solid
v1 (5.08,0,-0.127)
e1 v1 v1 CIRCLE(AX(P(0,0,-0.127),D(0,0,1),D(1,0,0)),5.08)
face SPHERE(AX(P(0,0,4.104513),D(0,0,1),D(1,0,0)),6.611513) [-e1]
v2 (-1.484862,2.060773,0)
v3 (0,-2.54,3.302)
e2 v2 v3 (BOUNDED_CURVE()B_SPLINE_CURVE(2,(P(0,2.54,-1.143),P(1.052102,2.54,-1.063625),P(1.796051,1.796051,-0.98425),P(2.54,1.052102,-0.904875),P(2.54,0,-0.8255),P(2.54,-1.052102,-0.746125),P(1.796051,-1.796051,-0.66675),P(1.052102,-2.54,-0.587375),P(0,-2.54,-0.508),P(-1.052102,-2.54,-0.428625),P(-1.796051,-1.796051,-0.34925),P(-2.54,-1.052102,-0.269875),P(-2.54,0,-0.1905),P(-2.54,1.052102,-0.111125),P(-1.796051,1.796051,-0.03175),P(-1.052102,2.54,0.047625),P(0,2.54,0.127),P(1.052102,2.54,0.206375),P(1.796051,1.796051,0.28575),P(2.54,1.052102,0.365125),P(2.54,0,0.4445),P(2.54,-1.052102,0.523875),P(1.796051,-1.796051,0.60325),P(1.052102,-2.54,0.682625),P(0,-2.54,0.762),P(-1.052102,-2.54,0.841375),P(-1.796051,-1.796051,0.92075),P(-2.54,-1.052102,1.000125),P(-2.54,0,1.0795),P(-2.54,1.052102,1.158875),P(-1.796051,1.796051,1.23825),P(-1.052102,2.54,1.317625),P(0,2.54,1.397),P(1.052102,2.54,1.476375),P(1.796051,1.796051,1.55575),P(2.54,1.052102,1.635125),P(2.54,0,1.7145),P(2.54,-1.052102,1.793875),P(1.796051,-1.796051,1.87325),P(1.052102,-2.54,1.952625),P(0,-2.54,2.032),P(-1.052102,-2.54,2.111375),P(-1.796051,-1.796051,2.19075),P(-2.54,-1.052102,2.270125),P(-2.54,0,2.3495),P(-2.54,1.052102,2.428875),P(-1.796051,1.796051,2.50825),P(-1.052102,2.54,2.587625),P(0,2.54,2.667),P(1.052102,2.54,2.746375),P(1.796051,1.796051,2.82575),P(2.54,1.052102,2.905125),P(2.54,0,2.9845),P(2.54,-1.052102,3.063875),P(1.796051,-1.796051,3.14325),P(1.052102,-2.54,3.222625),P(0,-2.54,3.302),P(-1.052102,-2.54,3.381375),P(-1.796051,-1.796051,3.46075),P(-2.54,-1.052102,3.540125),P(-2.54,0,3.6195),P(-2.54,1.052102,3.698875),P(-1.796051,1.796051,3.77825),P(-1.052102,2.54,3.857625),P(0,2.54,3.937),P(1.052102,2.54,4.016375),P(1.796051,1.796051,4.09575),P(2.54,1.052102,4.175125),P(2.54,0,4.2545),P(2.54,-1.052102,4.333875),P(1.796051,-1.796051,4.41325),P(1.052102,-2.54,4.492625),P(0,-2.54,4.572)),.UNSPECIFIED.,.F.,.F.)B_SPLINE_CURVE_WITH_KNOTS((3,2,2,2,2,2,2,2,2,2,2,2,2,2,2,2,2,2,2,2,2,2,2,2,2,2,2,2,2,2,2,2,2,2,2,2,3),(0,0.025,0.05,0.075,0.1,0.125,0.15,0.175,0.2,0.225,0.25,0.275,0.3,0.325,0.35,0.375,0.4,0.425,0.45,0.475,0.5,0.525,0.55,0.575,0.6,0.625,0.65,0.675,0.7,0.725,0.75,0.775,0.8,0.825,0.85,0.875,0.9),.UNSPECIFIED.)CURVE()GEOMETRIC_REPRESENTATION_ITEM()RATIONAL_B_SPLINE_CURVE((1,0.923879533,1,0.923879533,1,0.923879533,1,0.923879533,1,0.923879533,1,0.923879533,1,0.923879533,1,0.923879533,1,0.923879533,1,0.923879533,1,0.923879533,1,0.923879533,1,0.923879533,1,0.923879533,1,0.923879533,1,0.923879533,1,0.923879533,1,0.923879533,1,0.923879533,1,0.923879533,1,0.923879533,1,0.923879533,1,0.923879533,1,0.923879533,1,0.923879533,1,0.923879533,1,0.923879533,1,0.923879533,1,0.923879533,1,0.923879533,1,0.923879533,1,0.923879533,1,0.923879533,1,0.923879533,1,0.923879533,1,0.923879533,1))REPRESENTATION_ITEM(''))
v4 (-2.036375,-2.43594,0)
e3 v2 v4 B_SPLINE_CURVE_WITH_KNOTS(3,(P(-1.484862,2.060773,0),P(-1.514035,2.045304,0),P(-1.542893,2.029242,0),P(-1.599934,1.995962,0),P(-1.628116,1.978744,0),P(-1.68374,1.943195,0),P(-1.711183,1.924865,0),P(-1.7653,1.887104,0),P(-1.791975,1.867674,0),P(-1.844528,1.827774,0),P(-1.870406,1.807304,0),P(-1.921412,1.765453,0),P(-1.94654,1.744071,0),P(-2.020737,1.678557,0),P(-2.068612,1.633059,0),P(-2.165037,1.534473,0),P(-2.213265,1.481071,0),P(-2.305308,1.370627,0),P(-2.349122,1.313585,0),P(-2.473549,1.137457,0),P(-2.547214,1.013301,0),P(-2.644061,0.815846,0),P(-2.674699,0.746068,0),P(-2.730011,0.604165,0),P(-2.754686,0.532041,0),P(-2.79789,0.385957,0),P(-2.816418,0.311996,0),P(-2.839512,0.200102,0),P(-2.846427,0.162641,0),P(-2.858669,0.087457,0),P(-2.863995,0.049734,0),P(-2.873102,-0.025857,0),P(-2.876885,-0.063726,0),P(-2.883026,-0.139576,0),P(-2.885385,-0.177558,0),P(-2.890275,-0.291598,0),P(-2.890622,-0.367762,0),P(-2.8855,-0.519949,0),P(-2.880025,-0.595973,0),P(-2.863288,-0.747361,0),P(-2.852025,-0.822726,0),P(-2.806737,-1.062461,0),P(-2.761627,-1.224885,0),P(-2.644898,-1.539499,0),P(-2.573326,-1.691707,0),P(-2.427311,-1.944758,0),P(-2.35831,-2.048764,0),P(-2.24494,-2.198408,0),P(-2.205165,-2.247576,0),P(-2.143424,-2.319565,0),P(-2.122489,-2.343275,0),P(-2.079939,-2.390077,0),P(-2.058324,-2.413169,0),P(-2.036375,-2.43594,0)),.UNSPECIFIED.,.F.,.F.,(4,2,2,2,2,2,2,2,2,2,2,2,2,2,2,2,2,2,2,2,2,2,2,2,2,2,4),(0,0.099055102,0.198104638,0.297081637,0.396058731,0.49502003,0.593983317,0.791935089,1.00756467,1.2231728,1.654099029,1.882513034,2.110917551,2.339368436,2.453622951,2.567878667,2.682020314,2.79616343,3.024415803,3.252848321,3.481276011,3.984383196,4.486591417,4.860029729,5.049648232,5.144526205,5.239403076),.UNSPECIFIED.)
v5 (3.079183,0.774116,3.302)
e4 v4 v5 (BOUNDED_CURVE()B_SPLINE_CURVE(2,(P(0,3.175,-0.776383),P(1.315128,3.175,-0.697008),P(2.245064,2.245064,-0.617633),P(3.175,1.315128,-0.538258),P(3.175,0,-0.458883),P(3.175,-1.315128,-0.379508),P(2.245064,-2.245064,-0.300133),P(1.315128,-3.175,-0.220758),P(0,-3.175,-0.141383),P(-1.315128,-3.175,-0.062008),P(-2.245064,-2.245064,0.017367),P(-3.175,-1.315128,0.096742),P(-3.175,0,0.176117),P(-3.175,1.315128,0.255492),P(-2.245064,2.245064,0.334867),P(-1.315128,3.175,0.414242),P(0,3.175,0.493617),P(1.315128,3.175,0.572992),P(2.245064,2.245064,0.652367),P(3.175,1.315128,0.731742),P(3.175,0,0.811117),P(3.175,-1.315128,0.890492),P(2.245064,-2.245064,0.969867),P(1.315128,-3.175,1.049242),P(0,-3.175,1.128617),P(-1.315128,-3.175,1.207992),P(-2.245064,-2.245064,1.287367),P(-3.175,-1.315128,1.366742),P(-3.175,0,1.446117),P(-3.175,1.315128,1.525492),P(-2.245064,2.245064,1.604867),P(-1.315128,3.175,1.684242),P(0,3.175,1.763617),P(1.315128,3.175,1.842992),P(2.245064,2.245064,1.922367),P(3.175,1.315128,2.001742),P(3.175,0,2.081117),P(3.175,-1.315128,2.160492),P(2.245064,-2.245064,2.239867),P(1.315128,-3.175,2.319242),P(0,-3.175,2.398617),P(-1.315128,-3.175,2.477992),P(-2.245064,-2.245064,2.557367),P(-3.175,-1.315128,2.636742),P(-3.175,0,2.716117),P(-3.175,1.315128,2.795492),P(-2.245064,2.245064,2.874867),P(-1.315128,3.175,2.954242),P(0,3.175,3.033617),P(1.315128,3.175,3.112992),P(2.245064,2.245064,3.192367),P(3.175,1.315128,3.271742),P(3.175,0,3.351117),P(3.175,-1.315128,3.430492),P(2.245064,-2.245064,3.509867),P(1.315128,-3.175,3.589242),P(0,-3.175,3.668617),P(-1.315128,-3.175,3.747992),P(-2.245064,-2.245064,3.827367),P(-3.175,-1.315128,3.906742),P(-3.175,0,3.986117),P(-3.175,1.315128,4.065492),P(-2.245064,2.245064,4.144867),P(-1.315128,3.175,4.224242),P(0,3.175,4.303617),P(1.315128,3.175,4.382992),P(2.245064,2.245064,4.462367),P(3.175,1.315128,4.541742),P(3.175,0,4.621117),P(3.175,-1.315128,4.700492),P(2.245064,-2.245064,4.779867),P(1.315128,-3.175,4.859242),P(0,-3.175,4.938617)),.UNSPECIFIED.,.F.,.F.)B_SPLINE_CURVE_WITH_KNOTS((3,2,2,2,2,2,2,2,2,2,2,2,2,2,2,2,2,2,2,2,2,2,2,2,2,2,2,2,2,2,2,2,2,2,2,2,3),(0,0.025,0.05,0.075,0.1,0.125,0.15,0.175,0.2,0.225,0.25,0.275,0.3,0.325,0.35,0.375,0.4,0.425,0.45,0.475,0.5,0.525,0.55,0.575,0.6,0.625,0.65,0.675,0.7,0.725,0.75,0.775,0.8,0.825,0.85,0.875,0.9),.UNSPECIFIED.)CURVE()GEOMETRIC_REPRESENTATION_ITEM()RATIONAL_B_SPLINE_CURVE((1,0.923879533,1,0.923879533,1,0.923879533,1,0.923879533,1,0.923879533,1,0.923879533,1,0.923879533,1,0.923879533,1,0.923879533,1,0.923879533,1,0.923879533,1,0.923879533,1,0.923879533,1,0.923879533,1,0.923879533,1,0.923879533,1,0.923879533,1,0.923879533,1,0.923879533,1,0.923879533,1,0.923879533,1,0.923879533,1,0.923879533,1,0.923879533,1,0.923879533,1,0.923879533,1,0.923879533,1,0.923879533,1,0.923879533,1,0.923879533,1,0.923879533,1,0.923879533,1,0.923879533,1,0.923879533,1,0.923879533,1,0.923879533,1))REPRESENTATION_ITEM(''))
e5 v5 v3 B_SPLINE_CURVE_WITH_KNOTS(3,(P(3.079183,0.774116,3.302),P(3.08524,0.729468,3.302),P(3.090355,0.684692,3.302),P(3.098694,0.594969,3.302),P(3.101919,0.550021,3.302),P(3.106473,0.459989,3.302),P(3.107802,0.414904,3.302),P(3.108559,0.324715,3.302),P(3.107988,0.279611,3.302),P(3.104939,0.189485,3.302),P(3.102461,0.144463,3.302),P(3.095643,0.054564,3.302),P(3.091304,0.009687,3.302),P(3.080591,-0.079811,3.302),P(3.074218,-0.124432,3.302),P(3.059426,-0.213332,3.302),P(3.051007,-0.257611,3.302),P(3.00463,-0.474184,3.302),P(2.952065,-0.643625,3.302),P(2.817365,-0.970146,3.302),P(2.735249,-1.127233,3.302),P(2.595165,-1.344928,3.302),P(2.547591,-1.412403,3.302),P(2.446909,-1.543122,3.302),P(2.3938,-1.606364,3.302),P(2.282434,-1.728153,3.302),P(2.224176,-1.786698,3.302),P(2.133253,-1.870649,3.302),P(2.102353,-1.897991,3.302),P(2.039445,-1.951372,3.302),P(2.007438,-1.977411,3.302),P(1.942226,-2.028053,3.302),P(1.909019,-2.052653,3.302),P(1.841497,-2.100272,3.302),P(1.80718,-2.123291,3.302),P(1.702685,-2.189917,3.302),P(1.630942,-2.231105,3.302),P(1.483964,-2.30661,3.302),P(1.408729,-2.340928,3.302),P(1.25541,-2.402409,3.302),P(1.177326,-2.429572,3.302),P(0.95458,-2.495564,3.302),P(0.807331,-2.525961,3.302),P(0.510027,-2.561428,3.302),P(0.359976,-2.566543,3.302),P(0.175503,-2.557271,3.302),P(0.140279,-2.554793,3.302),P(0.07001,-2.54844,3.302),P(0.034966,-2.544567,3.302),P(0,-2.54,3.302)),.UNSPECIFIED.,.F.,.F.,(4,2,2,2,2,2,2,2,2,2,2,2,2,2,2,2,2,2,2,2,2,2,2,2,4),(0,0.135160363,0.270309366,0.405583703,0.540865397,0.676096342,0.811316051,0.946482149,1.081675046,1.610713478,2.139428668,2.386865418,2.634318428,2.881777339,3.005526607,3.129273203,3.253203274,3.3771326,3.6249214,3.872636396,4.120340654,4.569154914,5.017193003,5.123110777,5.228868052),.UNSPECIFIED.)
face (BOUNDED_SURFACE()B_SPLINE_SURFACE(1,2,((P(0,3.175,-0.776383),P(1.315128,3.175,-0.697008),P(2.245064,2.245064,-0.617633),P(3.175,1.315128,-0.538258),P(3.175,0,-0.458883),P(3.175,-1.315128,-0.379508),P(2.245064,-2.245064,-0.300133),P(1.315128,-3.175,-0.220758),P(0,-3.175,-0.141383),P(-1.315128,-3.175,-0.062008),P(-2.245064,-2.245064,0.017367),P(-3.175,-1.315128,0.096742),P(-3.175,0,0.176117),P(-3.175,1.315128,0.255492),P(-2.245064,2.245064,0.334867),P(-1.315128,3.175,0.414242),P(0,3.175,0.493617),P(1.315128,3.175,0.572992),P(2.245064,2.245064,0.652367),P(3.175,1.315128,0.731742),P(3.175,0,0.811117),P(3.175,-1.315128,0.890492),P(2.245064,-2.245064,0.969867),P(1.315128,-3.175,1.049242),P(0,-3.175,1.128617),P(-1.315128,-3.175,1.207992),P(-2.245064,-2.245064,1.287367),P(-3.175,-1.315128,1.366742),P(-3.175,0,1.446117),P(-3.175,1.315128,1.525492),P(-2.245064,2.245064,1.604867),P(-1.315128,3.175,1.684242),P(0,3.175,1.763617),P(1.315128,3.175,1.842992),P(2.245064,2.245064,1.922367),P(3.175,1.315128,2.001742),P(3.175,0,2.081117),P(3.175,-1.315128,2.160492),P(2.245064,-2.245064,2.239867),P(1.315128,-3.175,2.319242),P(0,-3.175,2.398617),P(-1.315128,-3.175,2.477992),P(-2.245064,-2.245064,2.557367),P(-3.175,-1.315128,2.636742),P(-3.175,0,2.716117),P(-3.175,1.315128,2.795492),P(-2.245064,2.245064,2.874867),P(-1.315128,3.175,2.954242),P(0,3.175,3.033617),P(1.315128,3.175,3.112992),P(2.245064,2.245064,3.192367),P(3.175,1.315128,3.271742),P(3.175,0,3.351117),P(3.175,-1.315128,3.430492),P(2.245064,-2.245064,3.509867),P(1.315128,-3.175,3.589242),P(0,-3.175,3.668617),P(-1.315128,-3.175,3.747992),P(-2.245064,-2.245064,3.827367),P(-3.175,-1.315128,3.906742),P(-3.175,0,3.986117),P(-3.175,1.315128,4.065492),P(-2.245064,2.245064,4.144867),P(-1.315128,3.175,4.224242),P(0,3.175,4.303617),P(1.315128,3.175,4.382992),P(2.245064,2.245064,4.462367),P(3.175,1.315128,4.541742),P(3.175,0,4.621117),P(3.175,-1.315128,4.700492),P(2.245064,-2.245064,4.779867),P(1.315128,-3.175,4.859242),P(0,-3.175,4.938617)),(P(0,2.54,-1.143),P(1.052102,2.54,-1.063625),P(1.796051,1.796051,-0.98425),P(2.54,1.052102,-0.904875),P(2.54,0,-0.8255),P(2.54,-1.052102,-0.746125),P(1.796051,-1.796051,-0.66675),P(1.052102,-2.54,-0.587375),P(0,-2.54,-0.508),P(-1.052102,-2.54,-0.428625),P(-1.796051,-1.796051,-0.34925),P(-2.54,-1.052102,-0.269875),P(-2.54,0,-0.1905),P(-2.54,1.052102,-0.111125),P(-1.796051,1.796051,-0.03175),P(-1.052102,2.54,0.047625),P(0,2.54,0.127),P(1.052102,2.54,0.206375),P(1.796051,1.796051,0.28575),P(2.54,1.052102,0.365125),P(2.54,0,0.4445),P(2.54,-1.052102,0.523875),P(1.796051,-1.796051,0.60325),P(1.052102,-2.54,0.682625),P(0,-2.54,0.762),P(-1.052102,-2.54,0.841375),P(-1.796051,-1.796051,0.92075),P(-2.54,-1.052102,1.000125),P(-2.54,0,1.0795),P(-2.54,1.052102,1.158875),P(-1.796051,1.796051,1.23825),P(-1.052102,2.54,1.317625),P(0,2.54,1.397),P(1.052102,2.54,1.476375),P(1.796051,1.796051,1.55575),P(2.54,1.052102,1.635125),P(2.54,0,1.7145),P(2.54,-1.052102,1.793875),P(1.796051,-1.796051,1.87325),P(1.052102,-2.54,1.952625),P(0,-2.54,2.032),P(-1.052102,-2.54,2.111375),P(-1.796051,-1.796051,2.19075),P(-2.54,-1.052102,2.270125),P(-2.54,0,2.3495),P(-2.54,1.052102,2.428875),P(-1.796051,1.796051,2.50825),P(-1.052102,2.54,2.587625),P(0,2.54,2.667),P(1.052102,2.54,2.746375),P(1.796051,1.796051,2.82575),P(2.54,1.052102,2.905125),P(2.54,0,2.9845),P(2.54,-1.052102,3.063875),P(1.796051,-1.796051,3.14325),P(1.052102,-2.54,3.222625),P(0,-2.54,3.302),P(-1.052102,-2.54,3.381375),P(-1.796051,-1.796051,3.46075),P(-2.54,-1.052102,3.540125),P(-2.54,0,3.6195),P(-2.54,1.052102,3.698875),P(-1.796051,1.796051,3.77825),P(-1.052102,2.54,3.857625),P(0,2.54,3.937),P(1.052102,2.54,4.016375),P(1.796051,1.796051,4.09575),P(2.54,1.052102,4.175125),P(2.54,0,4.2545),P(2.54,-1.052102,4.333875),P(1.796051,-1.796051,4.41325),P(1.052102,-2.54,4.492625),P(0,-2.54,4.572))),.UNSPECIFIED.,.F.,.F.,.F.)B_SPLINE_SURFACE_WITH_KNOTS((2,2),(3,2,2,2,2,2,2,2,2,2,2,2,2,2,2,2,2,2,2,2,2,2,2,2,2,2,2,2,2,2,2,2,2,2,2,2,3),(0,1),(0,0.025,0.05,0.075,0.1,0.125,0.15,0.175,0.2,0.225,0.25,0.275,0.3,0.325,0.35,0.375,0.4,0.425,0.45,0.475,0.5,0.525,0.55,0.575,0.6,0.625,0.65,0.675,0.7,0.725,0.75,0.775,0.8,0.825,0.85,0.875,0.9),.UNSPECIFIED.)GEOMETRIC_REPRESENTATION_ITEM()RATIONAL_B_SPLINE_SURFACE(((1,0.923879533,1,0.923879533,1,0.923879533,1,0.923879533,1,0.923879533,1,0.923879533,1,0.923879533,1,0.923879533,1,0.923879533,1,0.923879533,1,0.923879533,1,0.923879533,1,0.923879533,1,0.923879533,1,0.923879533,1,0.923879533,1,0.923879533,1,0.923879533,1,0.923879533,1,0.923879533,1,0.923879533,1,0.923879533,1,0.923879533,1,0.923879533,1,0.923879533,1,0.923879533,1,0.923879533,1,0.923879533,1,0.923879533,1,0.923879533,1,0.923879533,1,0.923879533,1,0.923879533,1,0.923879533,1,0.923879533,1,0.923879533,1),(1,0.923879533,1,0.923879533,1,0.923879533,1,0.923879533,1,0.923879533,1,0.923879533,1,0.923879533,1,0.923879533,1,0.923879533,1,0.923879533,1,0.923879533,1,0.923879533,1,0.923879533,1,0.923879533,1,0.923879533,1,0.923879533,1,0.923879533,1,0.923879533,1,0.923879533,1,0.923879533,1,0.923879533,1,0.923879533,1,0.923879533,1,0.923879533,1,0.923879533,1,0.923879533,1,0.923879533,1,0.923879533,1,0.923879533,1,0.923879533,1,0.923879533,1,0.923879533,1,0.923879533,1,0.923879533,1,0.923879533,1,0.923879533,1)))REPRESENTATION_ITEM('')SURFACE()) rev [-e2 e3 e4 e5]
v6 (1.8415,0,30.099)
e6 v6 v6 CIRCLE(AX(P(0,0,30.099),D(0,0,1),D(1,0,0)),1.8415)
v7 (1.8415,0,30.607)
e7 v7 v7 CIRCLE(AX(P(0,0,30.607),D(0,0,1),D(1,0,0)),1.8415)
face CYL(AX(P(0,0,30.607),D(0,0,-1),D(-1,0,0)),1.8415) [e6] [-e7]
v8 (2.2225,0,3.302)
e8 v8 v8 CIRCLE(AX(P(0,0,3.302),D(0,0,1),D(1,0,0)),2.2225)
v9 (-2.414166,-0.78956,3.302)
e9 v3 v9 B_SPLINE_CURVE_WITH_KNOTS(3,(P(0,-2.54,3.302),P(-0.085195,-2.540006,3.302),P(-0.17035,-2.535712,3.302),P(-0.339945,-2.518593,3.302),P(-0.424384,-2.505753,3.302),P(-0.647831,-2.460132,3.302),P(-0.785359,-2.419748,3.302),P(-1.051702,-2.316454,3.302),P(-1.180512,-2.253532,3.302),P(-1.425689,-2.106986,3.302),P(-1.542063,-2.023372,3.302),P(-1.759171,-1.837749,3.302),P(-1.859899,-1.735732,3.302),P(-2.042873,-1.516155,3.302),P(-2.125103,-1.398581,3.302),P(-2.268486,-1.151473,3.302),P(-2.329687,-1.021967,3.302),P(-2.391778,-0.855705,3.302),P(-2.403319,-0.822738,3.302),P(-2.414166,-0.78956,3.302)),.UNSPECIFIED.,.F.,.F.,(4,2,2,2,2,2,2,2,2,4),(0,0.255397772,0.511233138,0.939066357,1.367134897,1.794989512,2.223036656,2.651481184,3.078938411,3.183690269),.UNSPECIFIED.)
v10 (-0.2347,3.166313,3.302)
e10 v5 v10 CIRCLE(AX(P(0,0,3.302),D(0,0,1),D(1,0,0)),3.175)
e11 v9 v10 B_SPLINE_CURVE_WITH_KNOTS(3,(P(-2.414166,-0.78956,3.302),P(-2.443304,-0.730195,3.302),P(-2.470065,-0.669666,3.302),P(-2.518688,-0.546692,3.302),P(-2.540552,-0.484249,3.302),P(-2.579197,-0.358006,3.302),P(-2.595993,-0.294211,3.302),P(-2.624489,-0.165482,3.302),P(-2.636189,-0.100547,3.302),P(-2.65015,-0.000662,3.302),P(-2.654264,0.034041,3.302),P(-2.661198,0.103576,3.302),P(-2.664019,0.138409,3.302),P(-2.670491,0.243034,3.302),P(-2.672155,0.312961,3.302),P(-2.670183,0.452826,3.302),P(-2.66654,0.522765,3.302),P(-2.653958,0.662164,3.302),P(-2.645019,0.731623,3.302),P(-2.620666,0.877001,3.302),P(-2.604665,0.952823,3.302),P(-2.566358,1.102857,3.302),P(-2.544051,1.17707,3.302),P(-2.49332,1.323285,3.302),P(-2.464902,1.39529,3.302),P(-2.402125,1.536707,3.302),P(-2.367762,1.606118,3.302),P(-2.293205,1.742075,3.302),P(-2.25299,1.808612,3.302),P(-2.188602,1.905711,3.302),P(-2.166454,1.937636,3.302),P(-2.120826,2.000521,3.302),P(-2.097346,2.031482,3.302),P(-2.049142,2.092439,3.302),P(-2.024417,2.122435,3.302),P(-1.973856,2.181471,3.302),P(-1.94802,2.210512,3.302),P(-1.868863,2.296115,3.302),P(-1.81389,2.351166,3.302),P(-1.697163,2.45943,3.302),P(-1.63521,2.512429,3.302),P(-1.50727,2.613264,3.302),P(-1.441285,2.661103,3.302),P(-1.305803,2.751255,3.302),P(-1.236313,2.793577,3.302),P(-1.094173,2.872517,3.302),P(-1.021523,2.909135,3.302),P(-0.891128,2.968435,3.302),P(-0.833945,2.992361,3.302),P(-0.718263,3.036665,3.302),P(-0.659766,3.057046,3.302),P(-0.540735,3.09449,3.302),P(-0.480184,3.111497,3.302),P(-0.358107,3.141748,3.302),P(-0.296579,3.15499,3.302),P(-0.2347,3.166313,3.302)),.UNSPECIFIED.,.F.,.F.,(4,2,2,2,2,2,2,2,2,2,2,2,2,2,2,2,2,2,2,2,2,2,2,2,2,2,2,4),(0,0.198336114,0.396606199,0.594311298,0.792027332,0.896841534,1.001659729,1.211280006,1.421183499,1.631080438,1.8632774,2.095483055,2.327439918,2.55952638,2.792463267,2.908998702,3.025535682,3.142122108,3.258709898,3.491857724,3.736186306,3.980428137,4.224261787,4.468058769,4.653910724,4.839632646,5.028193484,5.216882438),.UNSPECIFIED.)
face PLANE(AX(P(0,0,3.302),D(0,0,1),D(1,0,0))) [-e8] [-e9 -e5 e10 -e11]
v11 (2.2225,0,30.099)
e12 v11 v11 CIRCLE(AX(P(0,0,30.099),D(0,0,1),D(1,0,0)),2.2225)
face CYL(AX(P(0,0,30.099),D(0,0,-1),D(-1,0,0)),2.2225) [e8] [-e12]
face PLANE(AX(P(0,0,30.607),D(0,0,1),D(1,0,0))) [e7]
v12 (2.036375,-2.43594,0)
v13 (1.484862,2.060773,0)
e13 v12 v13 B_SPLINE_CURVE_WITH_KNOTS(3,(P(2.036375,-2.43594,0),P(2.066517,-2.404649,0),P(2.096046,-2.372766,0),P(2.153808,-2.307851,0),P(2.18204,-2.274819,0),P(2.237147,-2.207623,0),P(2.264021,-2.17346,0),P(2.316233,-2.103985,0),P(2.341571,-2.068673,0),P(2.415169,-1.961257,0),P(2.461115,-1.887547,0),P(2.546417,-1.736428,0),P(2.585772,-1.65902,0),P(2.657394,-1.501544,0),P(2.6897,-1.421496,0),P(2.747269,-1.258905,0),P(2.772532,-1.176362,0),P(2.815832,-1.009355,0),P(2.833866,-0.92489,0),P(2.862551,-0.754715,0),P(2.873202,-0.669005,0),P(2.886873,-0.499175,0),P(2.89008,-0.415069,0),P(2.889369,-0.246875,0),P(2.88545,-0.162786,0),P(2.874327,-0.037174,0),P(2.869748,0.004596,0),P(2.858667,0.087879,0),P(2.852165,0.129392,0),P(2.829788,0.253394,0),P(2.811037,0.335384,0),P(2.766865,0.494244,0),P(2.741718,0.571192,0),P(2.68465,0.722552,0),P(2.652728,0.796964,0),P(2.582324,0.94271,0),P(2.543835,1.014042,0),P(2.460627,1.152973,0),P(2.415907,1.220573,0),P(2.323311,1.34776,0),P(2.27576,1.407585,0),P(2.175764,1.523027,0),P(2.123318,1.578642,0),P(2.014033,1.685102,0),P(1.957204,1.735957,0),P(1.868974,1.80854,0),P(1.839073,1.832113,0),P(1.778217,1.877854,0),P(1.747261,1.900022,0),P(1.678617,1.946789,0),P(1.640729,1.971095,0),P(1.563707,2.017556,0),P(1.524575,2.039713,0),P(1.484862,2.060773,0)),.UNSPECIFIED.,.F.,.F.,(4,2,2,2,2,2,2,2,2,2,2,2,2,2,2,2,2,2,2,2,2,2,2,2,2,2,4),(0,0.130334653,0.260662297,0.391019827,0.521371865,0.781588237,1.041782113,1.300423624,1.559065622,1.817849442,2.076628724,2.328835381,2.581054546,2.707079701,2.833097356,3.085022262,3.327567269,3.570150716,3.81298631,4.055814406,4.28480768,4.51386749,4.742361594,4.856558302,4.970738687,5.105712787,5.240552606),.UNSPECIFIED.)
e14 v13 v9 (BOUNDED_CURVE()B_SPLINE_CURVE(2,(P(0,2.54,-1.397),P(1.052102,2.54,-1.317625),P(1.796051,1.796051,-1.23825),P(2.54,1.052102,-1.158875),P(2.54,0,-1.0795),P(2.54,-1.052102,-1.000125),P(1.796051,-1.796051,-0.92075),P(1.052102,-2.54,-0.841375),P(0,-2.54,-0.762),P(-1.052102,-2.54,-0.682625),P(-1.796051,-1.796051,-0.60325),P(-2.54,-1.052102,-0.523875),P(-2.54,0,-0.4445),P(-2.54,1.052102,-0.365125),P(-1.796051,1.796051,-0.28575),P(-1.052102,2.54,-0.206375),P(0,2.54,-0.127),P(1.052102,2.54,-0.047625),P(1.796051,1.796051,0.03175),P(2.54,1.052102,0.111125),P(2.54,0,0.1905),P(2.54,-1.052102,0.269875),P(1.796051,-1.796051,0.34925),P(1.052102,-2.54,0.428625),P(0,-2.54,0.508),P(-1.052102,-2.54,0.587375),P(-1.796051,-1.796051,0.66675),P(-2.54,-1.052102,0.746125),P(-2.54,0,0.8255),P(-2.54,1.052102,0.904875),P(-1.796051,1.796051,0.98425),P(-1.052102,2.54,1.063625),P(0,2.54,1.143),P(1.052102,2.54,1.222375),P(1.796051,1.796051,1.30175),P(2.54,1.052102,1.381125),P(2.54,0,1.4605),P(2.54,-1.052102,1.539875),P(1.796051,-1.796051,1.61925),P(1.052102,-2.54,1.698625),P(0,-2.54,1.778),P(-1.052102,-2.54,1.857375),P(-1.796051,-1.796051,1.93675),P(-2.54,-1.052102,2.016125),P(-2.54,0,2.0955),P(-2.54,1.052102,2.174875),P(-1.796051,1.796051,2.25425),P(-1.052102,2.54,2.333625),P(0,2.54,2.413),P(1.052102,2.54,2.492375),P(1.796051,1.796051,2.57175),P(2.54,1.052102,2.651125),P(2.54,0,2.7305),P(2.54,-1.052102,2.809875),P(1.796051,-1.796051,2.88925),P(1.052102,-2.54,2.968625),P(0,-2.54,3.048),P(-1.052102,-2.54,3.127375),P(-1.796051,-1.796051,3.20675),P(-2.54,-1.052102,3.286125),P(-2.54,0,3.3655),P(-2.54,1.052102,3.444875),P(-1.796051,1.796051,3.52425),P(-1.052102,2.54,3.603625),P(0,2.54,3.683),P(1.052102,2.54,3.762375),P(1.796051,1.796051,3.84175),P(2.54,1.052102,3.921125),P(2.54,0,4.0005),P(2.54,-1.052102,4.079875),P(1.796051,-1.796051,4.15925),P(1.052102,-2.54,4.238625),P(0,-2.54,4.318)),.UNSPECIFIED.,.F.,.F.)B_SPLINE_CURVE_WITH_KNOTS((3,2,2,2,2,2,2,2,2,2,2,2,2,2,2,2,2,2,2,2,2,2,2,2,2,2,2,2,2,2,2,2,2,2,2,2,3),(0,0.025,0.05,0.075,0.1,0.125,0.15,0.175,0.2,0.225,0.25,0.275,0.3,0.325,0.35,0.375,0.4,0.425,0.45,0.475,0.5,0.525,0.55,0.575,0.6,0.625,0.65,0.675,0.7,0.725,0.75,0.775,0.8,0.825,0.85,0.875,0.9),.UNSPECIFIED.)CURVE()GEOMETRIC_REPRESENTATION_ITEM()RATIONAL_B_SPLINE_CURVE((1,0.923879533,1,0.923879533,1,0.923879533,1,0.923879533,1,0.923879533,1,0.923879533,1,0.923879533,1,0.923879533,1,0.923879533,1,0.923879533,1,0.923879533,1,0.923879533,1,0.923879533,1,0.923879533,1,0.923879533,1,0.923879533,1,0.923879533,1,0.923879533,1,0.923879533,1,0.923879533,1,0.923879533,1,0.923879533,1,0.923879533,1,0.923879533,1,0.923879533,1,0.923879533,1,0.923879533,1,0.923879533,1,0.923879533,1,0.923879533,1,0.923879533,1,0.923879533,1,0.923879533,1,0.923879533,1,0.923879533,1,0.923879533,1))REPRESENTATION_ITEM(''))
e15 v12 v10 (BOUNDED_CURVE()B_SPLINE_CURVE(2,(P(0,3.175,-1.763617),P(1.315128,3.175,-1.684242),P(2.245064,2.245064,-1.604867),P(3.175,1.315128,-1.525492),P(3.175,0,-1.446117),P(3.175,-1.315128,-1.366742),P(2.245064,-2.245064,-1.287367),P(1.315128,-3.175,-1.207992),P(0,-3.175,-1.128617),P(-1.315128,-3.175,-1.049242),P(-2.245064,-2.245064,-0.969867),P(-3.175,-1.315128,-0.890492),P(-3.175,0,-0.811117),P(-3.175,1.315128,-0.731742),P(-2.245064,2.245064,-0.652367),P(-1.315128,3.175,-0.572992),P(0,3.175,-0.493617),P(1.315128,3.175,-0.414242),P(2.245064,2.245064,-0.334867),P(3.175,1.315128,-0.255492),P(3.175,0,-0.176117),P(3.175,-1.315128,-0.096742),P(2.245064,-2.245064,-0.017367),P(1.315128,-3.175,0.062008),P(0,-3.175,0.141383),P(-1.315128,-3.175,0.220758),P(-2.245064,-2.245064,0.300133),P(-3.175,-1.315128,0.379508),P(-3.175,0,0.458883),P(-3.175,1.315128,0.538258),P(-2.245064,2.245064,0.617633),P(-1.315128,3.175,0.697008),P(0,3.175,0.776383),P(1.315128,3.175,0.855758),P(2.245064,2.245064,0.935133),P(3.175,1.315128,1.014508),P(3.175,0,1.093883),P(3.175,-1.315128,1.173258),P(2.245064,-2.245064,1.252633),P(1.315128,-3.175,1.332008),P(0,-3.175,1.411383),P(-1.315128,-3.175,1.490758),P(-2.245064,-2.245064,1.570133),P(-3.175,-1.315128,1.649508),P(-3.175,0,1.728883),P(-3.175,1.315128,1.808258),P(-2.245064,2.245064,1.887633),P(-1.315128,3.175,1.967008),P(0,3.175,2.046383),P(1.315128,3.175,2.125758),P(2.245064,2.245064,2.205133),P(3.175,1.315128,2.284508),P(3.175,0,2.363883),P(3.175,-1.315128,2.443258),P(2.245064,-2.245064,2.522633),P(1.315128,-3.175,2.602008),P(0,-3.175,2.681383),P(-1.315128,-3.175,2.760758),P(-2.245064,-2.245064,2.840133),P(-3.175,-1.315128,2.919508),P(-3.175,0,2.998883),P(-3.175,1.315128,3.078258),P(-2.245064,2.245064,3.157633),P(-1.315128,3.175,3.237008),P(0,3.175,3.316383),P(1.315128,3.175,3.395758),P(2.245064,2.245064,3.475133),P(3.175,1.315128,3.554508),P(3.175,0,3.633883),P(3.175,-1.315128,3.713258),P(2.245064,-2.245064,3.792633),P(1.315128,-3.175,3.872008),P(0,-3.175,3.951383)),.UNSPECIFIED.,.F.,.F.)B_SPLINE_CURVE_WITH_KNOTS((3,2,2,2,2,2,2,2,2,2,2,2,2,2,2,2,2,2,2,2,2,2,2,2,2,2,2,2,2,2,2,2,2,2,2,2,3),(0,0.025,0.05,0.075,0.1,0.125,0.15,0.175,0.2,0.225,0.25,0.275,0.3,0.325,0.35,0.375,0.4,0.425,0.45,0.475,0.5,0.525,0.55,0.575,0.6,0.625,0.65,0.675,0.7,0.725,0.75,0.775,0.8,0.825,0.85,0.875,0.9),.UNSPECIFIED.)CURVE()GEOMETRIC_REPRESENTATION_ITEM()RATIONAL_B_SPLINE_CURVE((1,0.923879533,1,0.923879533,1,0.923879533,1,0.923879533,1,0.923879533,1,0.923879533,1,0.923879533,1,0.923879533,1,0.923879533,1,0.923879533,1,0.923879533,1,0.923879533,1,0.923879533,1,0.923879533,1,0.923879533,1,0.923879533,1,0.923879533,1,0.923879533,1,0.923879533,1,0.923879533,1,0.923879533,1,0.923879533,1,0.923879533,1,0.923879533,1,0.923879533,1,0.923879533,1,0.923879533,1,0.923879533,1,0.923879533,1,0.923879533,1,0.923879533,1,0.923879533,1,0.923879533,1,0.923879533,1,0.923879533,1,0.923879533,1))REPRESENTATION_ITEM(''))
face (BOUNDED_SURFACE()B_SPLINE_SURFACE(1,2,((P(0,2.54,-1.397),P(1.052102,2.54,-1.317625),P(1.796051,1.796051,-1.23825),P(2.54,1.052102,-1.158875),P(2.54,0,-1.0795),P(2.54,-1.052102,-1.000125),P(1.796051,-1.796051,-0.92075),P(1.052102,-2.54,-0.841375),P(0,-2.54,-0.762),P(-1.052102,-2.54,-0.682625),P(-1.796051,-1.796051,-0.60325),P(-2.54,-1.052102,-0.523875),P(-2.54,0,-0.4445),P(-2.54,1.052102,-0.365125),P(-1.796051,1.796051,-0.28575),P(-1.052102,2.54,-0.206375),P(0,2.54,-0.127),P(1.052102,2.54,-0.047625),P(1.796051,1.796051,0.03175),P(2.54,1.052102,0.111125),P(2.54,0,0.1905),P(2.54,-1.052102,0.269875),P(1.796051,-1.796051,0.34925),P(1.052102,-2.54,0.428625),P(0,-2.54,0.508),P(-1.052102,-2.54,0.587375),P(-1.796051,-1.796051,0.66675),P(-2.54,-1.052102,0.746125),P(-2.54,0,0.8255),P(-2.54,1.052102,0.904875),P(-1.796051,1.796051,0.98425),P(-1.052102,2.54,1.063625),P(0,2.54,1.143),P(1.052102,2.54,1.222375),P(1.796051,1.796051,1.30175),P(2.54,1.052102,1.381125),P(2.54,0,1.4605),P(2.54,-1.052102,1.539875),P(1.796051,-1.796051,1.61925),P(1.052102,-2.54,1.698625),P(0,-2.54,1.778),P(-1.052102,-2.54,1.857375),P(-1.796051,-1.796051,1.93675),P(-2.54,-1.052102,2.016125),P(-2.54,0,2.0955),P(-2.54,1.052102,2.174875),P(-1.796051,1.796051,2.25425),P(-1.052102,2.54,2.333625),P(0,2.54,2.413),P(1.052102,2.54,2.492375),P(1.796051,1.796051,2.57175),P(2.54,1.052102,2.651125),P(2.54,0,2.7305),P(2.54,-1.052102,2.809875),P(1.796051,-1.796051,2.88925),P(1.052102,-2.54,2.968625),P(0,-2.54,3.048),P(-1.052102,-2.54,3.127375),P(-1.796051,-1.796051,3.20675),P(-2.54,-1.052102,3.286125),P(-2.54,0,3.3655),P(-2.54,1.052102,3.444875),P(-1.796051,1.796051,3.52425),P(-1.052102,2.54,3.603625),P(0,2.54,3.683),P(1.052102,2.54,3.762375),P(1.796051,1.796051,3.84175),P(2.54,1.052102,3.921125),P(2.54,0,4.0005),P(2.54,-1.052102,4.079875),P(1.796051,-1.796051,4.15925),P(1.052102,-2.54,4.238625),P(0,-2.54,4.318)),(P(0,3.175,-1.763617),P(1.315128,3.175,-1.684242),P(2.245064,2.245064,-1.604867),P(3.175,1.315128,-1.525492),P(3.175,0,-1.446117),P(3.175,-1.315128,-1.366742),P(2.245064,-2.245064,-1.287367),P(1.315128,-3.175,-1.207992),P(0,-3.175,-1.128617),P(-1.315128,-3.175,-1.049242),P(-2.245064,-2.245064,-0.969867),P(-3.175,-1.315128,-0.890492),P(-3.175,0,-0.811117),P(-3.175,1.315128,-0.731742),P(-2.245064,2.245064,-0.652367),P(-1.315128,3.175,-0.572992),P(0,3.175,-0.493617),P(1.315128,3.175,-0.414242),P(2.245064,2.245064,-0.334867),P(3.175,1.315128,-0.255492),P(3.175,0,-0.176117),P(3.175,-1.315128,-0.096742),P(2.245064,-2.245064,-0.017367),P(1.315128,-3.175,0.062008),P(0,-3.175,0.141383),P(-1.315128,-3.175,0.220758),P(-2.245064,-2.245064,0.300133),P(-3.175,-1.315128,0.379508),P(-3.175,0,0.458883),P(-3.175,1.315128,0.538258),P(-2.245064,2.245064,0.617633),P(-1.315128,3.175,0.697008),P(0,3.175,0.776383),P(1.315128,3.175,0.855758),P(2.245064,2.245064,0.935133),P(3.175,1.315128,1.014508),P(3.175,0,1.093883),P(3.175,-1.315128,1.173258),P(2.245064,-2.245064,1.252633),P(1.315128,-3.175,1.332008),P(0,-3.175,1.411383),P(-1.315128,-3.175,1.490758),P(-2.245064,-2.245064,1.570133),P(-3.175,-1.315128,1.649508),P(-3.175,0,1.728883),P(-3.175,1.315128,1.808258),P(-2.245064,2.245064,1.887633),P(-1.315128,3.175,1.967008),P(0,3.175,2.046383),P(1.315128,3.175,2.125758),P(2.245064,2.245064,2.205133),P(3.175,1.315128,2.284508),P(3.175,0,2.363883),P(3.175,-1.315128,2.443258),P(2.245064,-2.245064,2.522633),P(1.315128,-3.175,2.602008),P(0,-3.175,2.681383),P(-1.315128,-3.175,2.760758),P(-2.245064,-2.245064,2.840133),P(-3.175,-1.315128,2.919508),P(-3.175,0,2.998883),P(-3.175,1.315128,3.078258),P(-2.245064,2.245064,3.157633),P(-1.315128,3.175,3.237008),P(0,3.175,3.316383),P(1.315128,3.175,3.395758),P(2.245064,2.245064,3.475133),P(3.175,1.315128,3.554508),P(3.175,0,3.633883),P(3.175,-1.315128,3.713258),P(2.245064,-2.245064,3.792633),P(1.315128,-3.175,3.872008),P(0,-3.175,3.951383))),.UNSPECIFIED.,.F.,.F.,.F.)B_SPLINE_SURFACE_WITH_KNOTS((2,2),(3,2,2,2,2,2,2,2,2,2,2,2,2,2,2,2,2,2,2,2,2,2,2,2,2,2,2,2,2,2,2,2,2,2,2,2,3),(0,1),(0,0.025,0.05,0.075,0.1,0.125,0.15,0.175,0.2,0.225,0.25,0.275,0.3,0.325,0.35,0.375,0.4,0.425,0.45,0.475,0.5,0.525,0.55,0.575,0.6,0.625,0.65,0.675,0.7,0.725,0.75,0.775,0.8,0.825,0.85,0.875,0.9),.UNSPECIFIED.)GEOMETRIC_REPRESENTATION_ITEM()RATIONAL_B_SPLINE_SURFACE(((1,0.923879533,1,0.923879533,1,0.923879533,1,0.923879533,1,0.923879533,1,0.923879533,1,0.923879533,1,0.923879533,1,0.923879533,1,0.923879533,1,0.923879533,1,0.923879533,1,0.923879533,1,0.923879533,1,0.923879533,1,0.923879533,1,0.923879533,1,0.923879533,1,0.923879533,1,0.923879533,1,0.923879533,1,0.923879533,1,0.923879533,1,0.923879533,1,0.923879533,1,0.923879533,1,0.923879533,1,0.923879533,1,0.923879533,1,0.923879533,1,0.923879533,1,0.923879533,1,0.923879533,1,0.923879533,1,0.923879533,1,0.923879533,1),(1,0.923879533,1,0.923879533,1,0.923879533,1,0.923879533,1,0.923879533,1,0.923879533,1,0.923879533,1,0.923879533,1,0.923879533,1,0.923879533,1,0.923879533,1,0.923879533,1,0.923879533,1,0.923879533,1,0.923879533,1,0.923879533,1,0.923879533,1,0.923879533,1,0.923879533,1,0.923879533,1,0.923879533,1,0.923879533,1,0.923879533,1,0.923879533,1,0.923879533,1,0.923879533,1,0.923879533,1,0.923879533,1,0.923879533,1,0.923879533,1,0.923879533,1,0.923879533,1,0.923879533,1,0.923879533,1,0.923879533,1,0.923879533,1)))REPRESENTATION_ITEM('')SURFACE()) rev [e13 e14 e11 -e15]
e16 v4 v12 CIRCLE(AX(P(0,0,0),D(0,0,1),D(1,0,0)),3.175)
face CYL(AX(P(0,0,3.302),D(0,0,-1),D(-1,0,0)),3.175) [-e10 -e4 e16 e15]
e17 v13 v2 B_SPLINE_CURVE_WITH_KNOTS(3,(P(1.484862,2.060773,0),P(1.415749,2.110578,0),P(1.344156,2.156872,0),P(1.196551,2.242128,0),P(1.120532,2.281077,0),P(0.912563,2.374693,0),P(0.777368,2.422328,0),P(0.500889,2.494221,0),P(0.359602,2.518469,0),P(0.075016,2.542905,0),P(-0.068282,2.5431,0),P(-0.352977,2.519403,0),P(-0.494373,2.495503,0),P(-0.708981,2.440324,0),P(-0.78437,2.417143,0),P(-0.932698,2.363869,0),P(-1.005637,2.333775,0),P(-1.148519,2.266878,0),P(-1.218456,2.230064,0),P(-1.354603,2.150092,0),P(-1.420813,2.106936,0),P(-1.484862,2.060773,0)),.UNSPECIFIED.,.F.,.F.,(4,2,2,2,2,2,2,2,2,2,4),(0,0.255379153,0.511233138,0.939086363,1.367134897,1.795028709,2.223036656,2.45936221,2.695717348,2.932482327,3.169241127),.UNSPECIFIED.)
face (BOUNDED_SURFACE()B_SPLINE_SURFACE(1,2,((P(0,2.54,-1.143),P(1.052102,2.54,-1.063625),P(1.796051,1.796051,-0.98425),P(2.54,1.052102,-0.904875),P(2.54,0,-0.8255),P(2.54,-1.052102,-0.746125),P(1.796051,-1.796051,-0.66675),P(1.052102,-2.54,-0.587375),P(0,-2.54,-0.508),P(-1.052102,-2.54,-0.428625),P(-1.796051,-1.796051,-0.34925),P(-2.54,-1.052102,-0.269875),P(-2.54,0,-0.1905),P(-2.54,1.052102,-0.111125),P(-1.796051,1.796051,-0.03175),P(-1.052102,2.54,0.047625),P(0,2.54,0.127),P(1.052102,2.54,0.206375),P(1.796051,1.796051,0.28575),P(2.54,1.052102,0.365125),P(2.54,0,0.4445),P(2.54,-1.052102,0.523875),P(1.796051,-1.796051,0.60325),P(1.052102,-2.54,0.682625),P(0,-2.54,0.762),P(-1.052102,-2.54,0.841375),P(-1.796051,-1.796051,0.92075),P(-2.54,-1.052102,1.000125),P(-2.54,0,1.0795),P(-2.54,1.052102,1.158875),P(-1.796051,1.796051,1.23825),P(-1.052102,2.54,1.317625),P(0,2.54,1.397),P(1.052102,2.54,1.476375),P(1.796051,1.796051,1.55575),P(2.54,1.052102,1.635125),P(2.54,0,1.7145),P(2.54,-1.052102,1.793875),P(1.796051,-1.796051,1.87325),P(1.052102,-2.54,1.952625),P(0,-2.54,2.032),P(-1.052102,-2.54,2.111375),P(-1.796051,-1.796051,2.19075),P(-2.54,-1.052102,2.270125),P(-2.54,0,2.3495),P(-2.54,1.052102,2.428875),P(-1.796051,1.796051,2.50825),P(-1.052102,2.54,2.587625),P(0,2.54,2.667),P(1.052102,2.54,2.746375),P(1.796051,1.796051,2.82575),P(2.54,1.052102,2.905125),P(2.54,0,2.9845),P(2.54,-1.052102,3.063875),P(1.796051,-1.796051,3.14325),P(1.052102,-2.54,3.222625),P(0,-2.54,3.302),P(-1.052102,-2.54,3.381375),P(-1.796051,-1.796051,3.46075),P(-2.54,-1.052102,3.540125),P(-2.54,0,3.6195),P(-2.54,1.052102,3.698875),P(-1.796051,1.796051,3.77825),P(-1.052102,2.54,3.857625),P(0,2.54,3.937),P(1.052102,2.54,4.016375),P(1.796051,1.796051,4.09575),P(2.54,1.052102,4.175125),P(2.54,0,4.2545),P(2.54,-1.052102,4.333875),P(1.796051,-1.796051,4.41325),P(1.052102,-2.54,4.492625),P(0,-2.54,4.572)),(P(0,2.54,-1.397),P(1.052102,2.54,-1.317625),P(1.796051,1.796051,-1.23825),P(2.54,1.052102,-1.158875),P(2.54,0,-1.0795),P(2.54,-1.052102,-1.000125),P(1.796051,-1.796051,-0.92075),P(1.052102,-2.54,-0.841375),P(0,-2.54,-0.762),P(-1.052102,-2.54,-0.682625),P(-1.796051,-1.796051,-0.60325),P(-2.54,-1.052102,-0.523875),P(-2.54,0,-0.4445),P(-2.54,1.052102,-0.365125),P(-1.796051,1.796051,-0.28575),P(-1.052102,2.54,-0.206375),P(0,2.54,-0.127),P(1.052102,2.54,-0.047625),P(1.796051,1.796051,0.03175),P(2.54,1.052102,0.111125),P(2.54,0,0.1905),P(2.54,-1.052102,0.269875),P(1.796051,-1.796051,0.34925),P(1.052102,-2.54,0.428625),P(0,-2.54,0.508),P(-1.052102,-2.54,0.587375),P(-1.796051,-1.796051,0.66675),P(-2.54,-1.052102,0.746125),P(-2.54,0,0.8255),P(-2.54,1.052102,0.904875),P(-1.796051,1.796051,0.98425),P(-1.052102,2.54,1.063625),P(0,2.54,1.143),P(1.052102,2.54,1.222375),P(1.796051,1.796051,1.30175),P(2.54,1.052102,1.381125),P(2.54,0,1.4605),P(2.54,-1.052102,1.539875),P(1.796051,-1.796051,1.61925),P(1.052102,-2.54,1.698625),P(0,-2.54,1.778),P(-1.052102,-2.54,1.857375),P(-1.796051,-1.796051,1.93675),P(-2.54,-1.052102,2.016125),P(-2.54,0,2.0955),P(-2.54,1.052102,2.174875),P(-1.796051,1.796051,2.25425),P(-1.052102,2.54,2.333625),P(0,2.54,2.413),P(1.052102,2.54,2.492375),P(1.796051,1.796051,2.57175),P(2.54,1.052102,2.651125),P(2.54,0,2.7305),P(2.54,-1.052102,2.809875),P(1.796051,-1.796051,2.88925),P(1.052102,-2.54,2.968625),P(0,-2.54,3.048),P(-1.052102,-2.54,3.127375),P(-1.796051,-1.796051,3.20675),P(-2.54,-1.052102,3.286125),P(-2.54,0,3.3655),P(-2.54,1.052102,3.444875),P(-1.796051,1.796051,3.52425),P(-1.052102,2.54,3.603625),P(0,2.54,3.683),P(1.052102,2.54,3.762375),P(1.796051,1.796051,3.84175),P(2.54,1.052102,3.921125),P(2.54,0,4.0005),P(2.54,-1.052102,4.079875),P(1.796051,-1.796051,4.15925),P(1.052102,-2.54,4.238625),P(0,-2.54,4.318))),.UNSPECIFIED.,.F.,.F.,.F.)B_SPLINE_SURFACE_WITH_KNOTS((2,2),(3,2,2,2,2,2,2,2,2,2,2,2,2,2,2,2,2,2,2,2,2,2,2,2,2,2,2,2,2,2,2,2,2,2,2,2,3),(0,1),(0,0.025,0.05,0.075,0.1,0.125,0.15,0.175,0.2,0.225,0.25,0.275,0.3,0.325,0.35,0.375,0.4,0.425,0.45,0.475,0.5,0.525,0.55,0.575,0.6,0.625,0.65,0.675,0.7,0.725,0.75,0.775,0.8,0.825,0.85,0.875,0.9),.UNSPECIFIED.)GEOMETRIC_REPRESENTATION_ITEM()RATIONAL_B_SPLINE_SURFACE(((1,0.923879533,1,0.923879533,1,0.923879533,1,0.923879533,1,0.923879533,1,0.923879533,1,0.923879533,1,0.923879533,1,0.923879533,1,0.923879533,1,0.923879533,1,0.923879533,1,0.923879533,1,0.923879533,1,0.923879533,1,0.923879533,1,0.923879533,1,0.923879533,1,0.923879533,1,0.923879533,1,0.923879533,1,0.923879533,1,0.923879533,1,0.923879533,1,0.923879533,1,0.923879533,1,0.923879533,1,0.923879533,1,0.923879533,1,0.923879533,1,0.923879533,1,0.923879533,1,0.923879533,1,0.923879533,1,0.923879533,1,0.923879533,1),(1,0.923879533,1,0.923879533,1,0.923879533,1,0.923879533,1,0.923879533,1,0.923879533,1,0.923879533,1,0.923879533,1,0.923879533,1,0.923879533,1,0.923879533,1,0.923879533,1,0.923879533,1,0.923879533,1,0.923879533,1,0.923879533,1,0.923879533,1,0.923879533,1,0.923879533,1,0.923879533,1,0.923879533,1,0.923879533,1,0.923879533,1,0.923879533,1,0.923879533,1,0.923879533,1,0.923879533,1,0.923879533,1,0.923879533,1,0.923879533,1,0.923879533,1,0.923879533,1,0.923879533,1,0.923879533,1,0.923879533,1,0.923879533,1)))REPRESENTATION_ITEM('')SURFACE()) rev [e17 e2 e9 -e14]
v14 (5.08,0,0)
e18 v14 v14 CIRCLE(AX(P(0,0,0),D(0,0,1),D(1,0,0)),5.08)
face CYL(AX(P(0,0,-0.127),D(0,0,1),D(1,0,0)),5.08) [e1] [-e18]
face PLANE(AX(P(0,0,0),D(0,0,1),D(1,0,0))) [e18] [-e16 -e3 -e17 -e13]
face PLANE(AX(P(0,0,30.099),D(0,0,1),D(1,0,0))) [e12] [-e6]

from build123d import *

# Parameters (mm, degrees)
SKETCH3_R           = 3.175
BOSS_EXTRUDE1_DEPTH = 3.302
CUT_SWEEP1_PITCH    = 1.27
SKETCH10_R          = 2.2225
BOSS_EXTRUDE5_DEPTH = 26.797
SKETCH9_R           = 5.08
BOSS_EXTRUDE4_DEPTH = 0.127
DOME3_FACE_RADIUS   = 5.08
DOME3_HEIGHT        = 2.38
SKETCH11_R          = 1.8415
BOSS_EXTRUDE6_DEPTH = 0.508


with BuildPart() as part:
    # Sketch3 → Boss-Extrude1 (new body)
    with BuildSketch(Plane.XY):
        with Locations(Location((0, 0, 0), (0, 0, 180))):
            Circle(SKETCH3_R)
    extrude(amount=BOSS_EXTRUDE1_DEPTH)

    # Cut-Sweep1: arcs per turn and ends read off the stored shape
    # Cut-Sweep1: the profile of Sketch5 profile screwed along a left-hand helix through 4.5 turns, 8 arcs to a turn; built about Z, then put on its axis
    cut_sweep1_z = Axis((0, 0, 0), (0, 0, 1))
    cut_sweep1_corners = [(2.54, 0, -1.397), (3.1753, 0, -1.763790626), (3.1753, 0, -0.776209374), (2.54, 0, -1.143)]
    with BuildLine(mode=Mode.PRIVATE) as cut_sweep1_profile:
        Line(cut_sweep1_corners[0], cut_sweep1_corners[1])
        Line(cut_sweep1_corners[1], cut_sweep1_corners[2])
        Line(cut_sweep1_corners[2], cut_sweep1_corners[3])
        Line(cut_sweep1_corners[3], cut_sweep1_corners[0])
    cut_sweep1_cap = Face(cut_sweep1_profile.wire())
    cut_sweep1_turn_angles = [0, -22.5, -45, -67.5, -90, -112.5, -135, -157.5, -180, -202.5, -225, -247.5, -270, -292.5, -315, -337.5, -360]
    cut_sweep1_turn_weights = [1, 0.9238795325112867, 1, 0.9238795325112867, 1, 0.9238795325112867, 1, 0.9238795325112867, 1, 0.9238795325112867, 1, 0.9238795325112867, 1, 0.9238795325112867, 1, 0.9238795325112867, 1]
    cut_sweep1_turn_rails = [Edge.make_bspline([Vector(p[0], p[1], 0).rotate(cut_sweep1_z, cut_sweep1_turn_angles[k]) / cut_sweep1_turn_weights[k] + Vector(0, 0, p[2] + -CUT_SWEEP1_PITCH * cut_sweep1_turn_angles[k] / 360) for k in range(17)], [0, 0, 0, 1, 1, 2, 2, 3, 3, 4, 4, 5, 5, 6, 6, 7, 7, 8, 8, 8], 2, cut_sweep1_turn_weights) for p in cut_sweep1_corners]
    cut_sweep1_turn_sides = [Face.make_surface_from_curves(cut_sweep1_turn_rails[p[0]], cut_sweep1_turn_rails[p[1]]) for p in [(0, 1), (1, 2), (2, 3), (3, 0)]]
    cut_sweep1_last_angles = [-1440, -1462.5, -1485, -1507.5, -1530, -1552.5, -1575, -1597.5, -1620]
    cut_sweep1_last_weights = [1, 0.9238795325112867, 1, 0.9238795325112867, 1, 0.9238795325112867, 1, 0.9238795325112867, 1]
    cut_sweep1_last_rails = [Edge.make_bspline([Vector(p[0], p[1], 0).rotate(cut_sweep1_z, cut_sweep1_last_angles[k]) / cut_sweep1_last_weights[k] + Vector(0, 0, p[2] + -CUT_SWEEP1_PITCH * cut_sweep1_last_angles[k] / 360) for k in range(9)], [0, 0, 0, 1, 1, 2, 2, 3, 3, 4, 4, 4], 2, cut_sweep1_last_weights) for p in cut_sweep1_corners]
    cut_sweep1_last_sides = [Face.make_surface_from_curves(cut_sweep1_last_rails[p[0]], cut_sweep1_last_rails[p[1]]) for p in [(0, 1), (1, 2), (2, 3), (3, 0)]]
    cut_sweep1 = Plane(origin=(0, 0, 0), x_dir=(0, 1, 0), z_dir=(0, 0, 1)) * Solid(Shell([*[p.moved(Location((0, 0, CUT_SWEEP1_PITCH * i))) for i in range(4) for p in cut_sweep1_turn_sides], *cut_sweep1_last_sides, cut_sweep1_cap, cut_sweep1_cap.rotate(cut_sweep1_z, -1620).moved(Location((0, 0, -CUT_SWEEP1_PITCH * -1620 / 360)))]))
    add(cut_sweep1, mode=Mode.SUBTRACT)

    # Sketch10 → Boss-Extrude5 (add)
    with BuildSketch(Plane.XY.offset(3.302)):
        Circle(SKETCH10_R)
    extrude(amount=BOSS_EXTRUDE5_DEPTH)

    # Sketch9 → Boss-Extrude4 (add)
    with BuildSketch(Plane.XY):
        Circle(SKETCH9_R)
    extrude(amount=-BOSS_EXTRUDE4_DEPTH)

    # Dome3: a dome of height H over a round flat face of radius A is a cap of a sphere of radius (A * A + H * H) / (2 * H)
    dome3_r = (DOME3_FACE_RADIUS * DOME3_FACE_RADIUS + DOME3_HEIGHT * DOME3_HEIGHT) / (2 * DOME3_HEIGHT)
    dome3_base = Plane((0, 0, -0.127), z_dir=(0, 0, -1))
    with Locations(dome3_base.offset(DOME3_HEIGHT - dome3_r)):
        dome3_ball = Sphere(dome3_r, mode=Mode.PRIVATE)
    add(split(dome3_ball, bisect_by=dome3_base, keep=Keep.TOP, mode=Mode.PRIVATE))

    # Sketch11 → Boss-Extrude6 (add)
    with BuildSketch(Plane.XY.offset(30.099)):
        Circle(SKETCH11_R)
    extrude(amount=BOSS_EXTRUDE6_DEPTH)


solid = part.part
